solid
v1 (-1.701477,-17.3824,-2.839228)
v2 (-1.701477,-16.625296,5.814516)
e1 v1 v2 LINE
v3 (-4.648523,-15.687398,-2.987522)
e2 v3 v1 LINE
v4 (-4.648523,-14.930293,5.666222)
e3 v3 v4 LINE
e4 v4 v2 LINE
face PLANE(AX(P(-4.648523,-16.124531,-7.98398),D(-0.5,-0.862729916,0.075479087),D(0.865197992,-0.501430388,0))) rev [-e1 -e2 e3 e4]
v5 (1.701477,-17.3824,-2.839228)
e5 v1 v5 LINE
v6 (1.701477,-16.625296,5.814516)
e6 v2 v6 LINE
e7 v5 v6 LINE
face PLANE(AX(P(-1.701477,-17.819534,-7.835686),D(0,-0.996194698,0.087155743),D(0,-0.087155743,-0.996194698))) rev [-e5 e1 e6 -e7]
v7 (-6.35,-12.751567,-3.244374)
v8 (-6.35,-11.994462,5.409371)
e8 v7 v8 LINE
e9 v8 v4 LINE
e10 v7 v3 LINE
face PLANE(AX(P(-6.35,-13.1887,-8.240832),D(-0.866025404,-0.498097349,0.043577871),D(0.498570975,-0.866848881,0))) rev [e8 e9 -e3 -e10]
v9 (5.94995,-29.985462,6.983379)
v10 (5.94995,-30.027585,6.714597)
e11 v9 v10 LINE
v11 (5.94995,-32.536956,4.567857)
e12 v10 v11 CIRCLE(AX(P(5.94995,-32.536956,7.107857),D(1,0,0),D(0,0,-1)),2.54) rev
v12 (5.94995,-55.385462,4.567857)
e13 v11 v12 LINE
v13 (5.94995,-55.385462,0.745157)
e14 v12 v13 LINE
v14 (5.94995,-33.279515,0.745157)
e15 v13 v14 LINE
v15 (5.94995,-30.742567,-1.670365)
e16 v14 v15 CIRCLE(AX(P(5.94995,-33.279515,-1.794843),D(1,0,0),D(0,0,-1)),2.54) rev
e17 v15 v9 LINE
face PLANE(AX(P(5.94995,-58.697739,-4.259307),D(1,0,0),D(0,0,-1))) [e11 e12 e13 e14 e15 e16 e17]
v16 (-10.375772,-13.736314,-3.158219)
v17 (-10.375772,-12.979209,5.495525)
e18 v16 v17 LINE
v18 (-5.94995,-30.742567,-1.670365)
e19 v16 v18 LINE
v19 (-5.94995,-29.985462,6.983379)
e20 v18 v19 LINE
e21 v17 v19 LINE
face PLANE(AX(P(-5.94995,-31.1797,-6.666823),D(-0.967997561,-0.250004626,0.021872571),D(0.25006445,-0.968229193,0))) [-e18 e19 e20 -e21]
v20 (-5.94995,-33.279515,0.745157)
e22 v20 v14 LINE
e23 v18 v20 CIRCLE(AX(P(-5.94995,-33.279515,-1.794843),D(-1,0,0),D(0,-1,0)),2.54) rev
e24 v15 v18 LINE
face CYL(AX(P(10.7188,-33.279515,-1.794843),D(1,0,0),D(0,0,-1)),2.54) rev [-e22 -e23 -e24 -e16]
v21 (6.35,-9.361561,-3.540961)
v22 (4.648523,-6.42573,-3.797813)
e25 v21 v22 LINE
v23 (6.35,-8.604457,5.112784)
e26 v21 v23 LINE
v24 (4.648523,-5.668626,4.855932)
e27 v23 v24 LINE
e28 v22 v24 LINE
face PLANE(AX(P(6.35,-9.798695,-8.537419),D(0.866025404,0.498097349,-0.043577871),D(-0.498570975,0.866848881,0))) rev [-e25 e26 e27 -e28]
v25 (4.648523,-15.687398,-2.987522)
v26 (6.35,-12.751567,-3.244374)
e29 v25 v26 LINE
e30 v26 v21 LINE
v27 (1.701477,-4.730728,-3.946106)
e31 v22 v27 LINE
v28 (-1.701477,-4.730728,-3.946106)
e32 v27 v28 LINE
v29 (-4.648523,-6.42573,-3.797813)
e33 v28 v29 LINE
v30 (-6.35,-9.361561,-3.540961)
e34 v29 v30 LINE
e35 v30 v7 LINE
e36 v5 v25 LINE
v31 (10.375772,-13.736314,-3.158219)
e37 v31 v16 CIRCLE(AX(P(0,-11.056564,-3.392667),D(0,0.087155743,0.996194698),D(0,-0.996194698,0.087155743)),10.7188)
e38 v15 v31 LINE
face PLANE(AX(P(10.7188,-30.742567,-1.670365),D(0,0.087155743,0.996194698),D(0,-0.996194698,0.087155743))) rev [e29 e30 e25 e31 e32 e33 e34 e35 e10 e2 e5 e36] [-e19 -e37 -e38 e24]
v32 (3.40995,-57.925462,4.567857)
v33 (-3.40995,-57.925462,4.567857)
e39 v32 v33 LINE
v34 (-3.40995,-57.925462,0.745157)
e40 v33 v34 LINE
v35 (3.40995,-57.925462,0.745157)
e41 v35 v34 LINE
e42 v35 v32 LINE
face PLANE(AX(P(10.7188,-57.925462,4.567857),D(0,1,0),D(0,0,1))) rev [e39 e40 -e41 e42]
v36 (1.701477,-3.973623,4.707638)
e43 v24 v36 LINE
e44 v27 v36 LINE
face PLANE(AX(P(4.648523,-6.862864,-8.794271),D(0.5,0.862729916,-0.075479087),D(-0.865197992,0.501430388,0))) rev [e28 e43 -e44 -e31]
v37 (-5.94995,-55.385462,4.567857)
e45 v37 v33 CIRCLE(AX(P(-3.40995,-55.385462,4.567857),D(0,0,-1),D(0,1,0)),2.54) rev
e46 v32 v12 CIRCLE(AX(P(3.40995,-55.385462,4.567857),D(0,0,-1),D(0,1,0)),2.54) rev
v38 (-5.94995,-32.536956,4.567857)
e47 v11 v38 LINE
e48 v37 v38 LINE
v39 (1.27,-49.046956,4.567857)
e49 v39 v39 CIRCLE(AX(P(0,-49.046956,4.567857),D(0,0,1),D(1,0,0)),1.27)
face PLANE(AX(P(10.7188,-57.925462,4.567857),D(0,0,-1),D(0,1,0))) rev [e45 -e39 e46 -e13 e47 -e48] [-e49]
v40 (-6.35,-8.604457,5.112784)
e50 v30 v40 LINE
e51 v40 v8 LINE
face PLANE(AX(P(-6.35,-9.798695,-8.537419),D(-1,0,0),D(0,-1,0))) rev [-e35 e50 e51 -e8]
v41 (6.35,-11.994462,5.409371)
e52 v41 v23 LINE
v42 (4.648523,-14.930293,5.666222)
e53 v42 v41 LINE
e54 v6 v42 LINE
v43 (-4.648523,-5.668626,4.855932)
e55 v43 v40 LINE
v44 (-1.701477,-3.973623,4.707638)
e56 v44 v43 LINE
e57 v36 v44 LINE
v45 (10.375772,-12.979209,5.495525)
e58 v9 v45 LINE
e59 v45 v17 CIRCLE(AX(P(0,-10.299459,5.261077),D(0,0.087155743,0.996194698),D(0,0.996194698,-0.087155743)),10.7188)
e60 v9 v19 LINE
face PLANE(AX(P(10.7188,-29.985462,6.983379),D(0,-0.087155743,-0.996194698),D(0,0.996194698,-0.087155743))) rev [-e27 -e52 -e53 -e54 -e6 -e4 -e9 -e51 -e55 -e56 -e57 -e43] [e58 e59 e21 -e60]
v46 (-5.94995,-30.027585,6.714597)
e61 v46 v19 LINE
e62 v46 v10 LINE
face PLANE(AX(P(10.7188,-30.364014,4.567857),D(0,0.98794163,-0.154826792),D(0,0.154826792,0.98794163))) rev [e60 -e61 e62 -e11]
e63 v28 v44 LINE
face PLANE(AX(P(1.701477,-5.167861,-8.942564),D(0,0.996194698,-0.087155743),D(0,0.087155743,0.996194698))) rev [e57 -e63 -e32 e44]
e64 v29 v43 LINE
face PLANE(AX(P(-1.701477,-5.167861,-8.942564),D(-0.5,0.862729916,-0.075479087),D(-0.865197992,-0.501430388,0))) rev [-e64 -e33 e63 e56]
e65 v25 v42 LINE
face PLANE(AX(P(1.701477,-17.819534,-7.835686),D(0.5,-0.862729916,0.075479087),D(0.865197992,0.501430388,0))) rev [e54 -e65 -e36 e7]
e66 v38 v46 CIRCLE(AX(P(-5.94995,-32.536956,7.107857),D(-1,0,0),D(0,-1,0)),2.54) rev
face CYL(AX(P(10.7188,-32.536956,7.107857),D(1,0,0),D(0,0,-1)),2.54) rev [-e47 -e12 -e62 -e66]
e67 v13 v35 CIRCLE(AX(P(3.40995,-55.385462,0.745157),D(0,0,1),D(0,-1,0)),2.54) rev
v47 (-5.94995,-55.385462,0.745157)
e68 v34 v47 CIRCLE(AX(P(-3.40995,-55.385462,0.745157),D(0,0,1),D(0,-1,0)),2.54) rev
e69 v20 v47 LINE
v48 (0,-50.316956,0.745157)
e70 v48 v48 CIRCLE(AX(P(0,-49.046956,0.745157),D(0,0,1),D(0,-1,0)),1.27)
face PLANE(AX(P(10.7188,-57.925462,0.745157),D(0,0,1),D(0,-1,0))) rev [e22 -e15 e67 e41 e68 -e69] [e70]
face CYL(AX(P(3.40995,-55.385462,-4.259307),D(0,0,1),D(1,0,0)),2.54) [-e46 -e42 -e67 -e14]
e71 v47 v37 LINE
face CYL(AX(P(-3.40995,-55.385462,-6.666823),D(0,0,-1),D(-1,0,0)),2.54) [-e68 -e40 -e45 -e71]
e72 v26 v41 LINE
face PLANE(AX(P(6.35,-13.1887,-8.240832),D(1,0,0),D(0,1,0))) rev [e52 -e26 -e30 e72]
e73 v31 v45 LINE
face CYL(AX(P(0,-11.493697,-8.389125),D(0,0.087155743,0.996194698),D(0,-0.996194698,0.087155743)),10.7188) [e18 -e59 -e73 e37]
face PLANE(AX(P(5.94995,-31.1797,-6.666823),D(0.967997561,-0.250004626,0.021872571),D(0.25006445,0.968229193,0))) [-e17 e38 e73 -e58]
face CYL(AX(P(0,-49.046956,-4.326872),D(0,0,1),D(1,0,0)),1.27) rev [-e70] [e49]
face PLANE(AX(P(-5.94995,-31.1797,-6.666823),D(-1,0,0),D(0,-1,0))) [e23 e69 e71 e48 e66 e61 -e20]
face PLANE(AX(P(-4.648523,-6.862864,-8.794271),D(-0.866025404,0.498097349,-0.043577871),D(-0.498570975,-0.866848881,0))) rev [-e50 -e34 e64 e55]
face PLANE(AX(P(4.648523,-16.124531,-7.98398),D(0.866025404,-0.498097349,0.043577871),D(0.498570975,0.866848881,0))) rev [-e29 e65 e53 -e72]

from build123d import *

# Parameters (mm, degrees)
BOSS_EXTRUDE1_DEPTH = 10.7188
SKETCH2_OUTSIDE_W   = 36.066
SKETCH2_OUTSIDE_H   = 73.696
CUT_EXTRUDE1_DEPTH  = 60.909415415
FILLET1_R           = 2.54
SKETCH6_R           = 1.27
CUT_EXTRUDE3_DEPTH  = 60.576572944
FILLET2_R           = 2.54


with BuildPart() as part:
    # Sketch1 → Boss-Extrude1 (new, symmetric)
    with BuildSketch(Plane(origin=(0, 0, 0), x_dir=(0, 0, -1), z_dir=(1, 0, 0))):
        Polygon((-4.567857039, -57.925462145), (-0.745157039, -57.925462145), (-0.745157039, -30.364014398), (1.670365013, -30.742566651), (4.326872052, -0.378552253), (-4.326872052, 0.378552253), (-6.983379091, -29.985462145), (-4.567857039, -30.364014398), align=None)
    extrude(amount=BOSS_EXTRUDE1_DEPTH, both=True)

    # Sketch2 outside → Cut-Extrude1 (cut, through all)
    # profile 1 of 2: a face of its own
    with BuildSketch(Plane(origin=(0, 0.378552253, 4.326872052), x_dir=(1, 0, 0), z_dir=(0, 0.08715574274765905, 0.9961946980917455))):
        with Locations((0, -28.78)):
            Rectangle(SKETCH2_OUTSIDE_W, SKETCH2_OUTSIDE_H)
        with BuildLine():
            Line((5.94995, -30.48), (10.375772253, -13.408785796))
            ThreePointArc((10.375772253, -13.408785796), (0, 0), (-10.375772253, -13.408785796))
            Line((-10.375772253, -13.408785796), (-5.94995, -30.48))
            Line((-5.94995, -30.48), (-5.94995, -58.103153246))
            Line((-5.94995, -58.103153246), (5.94995, -58.103153246))
            Line((5.94995, -58.103153246), (5.94995, -30.48))
        make_face(mode=Mode.SUBTRACT)
    # profile 2 of 2: a face of its own
    with BuildSketch(Plane(origin=(0, 0.378552253, 4.326872052), x_dir=(1, 0, 0), z_dir=(0, 0.08715574274765905, 0.9961946980917455))):
        Polygon((4.648522628, -6.070277372), (1.701477372, -4.3688), (-1.701477372, -4.3688), (-4.648522628, -6.070277372), (-6.35, -9.017322628), (-6.35, -12.420277372), (-4.648522628, -15.367322628), (-1.701477372, -17.0688), (1.701477372, -17.0688), (4.648522628, -15.367322628), (6.35, -12.420277372), (6.35, -9.017322628), align=None)
    extrude(amount=-CUT_EXTRUDE1_DEPTH, mode=Mode.SUBTRACT)

    # Fillet1
    # the kernel refuses this fillet: 2.54 mm, written as the material it adds along each edge
    with BuildSketch(Plane(origin=(-13.281888943, -30.364014398, 0.745157039), x_dir=(0, -0.15482679187338919, -0.9879416301169793), z_dir=(1, 0, 0))) as fillet1_piece_1_section:
        with BuildLine():
            CenterArc((2.960769294, -2.487084038), FILLET1_R, 101.715774122, 87.190976769)
            Line((0.451397554, -2.880344089), (0.401210119, -2.88820929))
            Line((0.401210119, -2.88820929), (-0.050187435, -0.007865201))
            Line((-0.050187435, -0.007865201), (0, 0.0508))
            ThreePointArc((0, 0.0508), (1.222502412, 0.0508), (2.434689535, 0.049741681))
            Line((2.434689535, 0.049741681), (2.445004824, 0))
        make_face()
    fillet1_piece_1 = extrude(amount=26.563777885, mode=Mode.PRIVATE)
    fillet1_piece_1 = split(fillet1_piece_1, bisect_by=Plane(origin=(-5.94995, -31.737023375, 0.445932994), z_dir=(1, 0, 0)), keep=Keep.TOP, mode=Mode.PRIVATE)
    fillet1_piece_1 = split(fillet1_piece_1, bisect_by=Plane(origin=(-5.654886332, -31.700159235, 0.4427078), z_dir=(-0.9679975606806361, -0.2500046262979335, 0.021872570630104494)), keep=Keep.TOP, mode=Mode.PRIVATE)
    add(fillet1_piece_1)
    with BuildSketch(Plane(origin=(-13.281888943, -30.364014398, 0.745157039), x_dir=(0, -0.15482679187338919, -0.9879416301169793), z_dir=(1, 0, 0))) as fillet1_piece_2_section:
        with BuildLine():
            CenterArc((2.960769294, -2.487084038), FILLET1_R, 101.715774122, 87.190976769)
            Line((0.451397554, -2.880344089), (0.401210119, -2.88820929))
            Line((0.401210119, -2.88820929), (-0.050187435, -0.007865201))
            Line((-0.050187435, -0.007865201), (0, 0.0508))
            ThreePointArc((0, 0.0508), (1.222502412, 0.0508), (2.434689535, 0.049741681))
            Line((2.434689535, 0.049741681), (2.445004824, 0))
        make_face()
    fillet1_piece_2 = extrude(amount=26.563777885, mode=Mode.PRIVATE)
    fillet1_piece_2 = split(fillet1_piece_2, bisect_by=Plane(origin=(-5.94995, -31.133883126, 0.125173685), z_dir=(1, 0, 0)), keep=Keep.TOP, mode=Mode.PRIVATE)
    fillet1_piece_2 = split(fillet1_piece_2, bisect_by=Plane(origin=(5.442501536, -32.539517415, 0.248150751), z_dir=(-0.967997560680636, 0.2500046262979333, -0.021872570630104476)), keep=Keep.TOP, mode=Mode.PRIVATE)
    fillet1_piece_2 = split(fillet1_piece_2, bisect_by=Plane(origin=(-5.442501536, -32.539517415, 0.248150751), z_dir=(0.9679975606806361, 0.2500046262979335, -0.021872570630104494)), keep=Keep.TOP, mode=Mode.PRIVATE)
    fillet1_piece_2 = split(fillet1_piece_2, bisect_by=Plane(origin=(5.94995, -31.133883126, 0.125173685), z_dir=(-1, 0, 0)), keep=Keep.TOP, mode=Mode.PRIVATE)
    add(fillet1_piece_2)
    with BuildSketch(Plane(origin=(-13.281888943, -30.364014398, 0.745157039), x_dir=(0, -0.15482679187338919, -0.9879416301169793), z_dir=(1, 0, 0))) as fillet1_piece_3_section:
        with BuildLine():
            CenterArc((2.960769294, -2.487084038), FILLET1_R, 101.715774122, 87.190976769)
            Line((0.451397554, -2.880344089), (0.401210119, -2.88820929))
            Line((0.401210119, -2.88820929), (-0.050187435, -0.007865201))
            Line((-0.050187435, -0.007865201), (0, 0.0508))
            ThreePointArc((0, 0.0508), (1.222502412, 0.0508), (2.434689535, 0.049741681))
            Line((2.434689535, 0.049741681), (2.445004824, 0))
        make_face()
    fillet1_piece_3 = extrude(amount=26.563777885, mode=Mode.PRIVATE)
    fillet1_piece_3 = split(fillet1_piece_3, bisect_by=Plane(origin=(-5.94995, -30.484623478, 0.0088191), z_dir=(-1, 0, 0)), keep=Keep.TOP, mode=Mode.PRIVATE)
    fillet1_piece_3 = split(fillet1_piece_3, bisect_by=Plane(origin=(-5.977723598, -30.488093407, 0.009122679), z_dir=(0.9679975606806361, 0.2500046262979335, -0.021872570630104494)), keep=Keep.TOP, mode=Mode.PRIVATE)
    add(fillet1_piece_3)
    with BuildSketch(Plane(origin=(-13.281888943, -30.364014398, 0.745157039), x_dir=(0, -0.15482679187338919, -0.9879416301169793), z_dir=(1, 0, 0))) as fillet1_piece_4_section:
        with BuildLine():
            CenterArc((2.960769294, -2.487084038), FILLET1_R, 101.715774122, 87.190976769)
            Line((0.451397554, -2.880344089), (0.401210119, -2.88820929))
            Line((0.401210119, -2.88820929), (-0.050187435, -0.007865201))
            Line((-0.050187435, -0.007865201), (0, 0.0508))
            ThreePointArc((0, 0.0508), (1.222502412, 0.0508), (2.434689535, 0.049741681))
            Line((2.434689535, 0.049741681), (2.445004824, 0))
        make_face()
    fillet1_piece_4 = extrude(amount=26.563777885, mode=Mode.PRIVATE)
    fillet1_piece_4 = split(fillet1_piece_4, bisect_by=Plane(origin=(5.654886332, -31.700159235, 0.4427078), z_dir=(0.967997560680636, -0.2500046262979333, 0.021872570630104476)), keep=Keep.TOP, mode=Mode.PRIVATE)
    fillet1_piece_4 = split(fillet1_piece_4, bisect_by=Plane(origin=(5.94995, -31.737023375, 0.445932994), z_dir=(-1, 0, 0)), keep=Keep.TOP, mode=Mode.PRIVATE)
    add(fillet1_piece_4)
    with BuildSketch(Plane(origin=(-13.281888943, -30.364014398, 0.745157039), x_dir=(0, -0.15482679187338919, -0.9879416301169793), z_dir=(1, 0, 0))) as fillet1_piece_5_section:
        with BuildLine():
            CenterArc((2.960769294, -2.487084038), FILLET1_R, 101.715774122, 87.190976769)
            Line((0.451397554, -2.880344089), (0.401210119, -2.88820929))
            Line((0.401210119, -2.88820929), (-0.050187435, -0.007865201))
            Line((-0.050187435, -0.007865201), (0, 0.0508))
            ThreePointArc((0, 0.0508), (1.222502412, 0.0508), (2.434689535, 0.049741681))
            Line((2.434689535, 0.049741681), (2.445004824, 0))
        make_face()
    fillet1_piece_5 = extrude(amount=26.563777885, mode=Mode.PRIVATE)
    fillet1_piece_5 = split(fillet1_piece_5, bisect_by=Plane(origin=(5.977723598, -30.488093407, 0.009122679), z_dir=(-0.967997560680636, 0.2500046262979333, -0.021872570630104476)), keep=Keep.TOP, mode=Mode.PRIVATE)
    fillet1_piece_5 = split(fillet1_piece_5, bisect_by=Plane(origin=(5.94995, -30.484623478, 0.0088191), z_dir=(1, 0, 0)), keep=Keep.TOP, mode=Mode.PRIVATE)
    add(fillet1_piece_5)
    with BuildSketch(Plane(origin=(5.94995, -30.364014398, 4.567857039), x_dir=(0, 0.15482679187338733, 0.9879416301169794), z_dir=(-1, 0, 0))) as fillet1_piece_6:
        with BuildLine():
            CenterArc((FILLET1_R * 0.855489011053, -FILLET1_R), FILLET1_R, 90, 81.093249109)
            Line((-FILLET1_R * 0.132452619064, -FILLET1_R * 0.845173208127), (-FILLET1_R * 0.152211451667, -FILLET1_R * 0.842076672289))
            Line((-FILLET1_R * 0.152211451667, -FILLET1_R * 0.842076672289), (-FILLET1_R * 0.0171097802211, FILLET1_R * 0.02))
            Line((-FILLET1_R * 0.0171097802211, FILLET1_R * 0.02), (FILLET1_R * 0.855489011053, FILLET1_R * 0.02))
            Line((FILLET1_R * 0.855489011053, FILLET1_R * 0.02), (FILLET1_R * 0.855489011053, 0))
        make_face()
    extrude(amount=11.8999)

    # Sketch6 → Cut-Extrude3 (cut, through all)
    with BuildSketch(Plane.XY.offset(4.567857039)):
        with Locations((0, -49.046956486)):
            Circle(SKETCH6_R)
    extrude(amount=-CUT_EXTRUDE3_DEPTH, mode=Mode.SUBTRACT)

    # Fillet2
    fillet2_edges = [part.edges().sort_by_distance(p)[0] for p in [
        (5.94995, -57.925462145, 2.656507039),
        (-5.94995, -57.925462145, 2.656507039),
    ]]
    fillet(fillet2_edges, radius=FILLET2_R)


solid = part.part
